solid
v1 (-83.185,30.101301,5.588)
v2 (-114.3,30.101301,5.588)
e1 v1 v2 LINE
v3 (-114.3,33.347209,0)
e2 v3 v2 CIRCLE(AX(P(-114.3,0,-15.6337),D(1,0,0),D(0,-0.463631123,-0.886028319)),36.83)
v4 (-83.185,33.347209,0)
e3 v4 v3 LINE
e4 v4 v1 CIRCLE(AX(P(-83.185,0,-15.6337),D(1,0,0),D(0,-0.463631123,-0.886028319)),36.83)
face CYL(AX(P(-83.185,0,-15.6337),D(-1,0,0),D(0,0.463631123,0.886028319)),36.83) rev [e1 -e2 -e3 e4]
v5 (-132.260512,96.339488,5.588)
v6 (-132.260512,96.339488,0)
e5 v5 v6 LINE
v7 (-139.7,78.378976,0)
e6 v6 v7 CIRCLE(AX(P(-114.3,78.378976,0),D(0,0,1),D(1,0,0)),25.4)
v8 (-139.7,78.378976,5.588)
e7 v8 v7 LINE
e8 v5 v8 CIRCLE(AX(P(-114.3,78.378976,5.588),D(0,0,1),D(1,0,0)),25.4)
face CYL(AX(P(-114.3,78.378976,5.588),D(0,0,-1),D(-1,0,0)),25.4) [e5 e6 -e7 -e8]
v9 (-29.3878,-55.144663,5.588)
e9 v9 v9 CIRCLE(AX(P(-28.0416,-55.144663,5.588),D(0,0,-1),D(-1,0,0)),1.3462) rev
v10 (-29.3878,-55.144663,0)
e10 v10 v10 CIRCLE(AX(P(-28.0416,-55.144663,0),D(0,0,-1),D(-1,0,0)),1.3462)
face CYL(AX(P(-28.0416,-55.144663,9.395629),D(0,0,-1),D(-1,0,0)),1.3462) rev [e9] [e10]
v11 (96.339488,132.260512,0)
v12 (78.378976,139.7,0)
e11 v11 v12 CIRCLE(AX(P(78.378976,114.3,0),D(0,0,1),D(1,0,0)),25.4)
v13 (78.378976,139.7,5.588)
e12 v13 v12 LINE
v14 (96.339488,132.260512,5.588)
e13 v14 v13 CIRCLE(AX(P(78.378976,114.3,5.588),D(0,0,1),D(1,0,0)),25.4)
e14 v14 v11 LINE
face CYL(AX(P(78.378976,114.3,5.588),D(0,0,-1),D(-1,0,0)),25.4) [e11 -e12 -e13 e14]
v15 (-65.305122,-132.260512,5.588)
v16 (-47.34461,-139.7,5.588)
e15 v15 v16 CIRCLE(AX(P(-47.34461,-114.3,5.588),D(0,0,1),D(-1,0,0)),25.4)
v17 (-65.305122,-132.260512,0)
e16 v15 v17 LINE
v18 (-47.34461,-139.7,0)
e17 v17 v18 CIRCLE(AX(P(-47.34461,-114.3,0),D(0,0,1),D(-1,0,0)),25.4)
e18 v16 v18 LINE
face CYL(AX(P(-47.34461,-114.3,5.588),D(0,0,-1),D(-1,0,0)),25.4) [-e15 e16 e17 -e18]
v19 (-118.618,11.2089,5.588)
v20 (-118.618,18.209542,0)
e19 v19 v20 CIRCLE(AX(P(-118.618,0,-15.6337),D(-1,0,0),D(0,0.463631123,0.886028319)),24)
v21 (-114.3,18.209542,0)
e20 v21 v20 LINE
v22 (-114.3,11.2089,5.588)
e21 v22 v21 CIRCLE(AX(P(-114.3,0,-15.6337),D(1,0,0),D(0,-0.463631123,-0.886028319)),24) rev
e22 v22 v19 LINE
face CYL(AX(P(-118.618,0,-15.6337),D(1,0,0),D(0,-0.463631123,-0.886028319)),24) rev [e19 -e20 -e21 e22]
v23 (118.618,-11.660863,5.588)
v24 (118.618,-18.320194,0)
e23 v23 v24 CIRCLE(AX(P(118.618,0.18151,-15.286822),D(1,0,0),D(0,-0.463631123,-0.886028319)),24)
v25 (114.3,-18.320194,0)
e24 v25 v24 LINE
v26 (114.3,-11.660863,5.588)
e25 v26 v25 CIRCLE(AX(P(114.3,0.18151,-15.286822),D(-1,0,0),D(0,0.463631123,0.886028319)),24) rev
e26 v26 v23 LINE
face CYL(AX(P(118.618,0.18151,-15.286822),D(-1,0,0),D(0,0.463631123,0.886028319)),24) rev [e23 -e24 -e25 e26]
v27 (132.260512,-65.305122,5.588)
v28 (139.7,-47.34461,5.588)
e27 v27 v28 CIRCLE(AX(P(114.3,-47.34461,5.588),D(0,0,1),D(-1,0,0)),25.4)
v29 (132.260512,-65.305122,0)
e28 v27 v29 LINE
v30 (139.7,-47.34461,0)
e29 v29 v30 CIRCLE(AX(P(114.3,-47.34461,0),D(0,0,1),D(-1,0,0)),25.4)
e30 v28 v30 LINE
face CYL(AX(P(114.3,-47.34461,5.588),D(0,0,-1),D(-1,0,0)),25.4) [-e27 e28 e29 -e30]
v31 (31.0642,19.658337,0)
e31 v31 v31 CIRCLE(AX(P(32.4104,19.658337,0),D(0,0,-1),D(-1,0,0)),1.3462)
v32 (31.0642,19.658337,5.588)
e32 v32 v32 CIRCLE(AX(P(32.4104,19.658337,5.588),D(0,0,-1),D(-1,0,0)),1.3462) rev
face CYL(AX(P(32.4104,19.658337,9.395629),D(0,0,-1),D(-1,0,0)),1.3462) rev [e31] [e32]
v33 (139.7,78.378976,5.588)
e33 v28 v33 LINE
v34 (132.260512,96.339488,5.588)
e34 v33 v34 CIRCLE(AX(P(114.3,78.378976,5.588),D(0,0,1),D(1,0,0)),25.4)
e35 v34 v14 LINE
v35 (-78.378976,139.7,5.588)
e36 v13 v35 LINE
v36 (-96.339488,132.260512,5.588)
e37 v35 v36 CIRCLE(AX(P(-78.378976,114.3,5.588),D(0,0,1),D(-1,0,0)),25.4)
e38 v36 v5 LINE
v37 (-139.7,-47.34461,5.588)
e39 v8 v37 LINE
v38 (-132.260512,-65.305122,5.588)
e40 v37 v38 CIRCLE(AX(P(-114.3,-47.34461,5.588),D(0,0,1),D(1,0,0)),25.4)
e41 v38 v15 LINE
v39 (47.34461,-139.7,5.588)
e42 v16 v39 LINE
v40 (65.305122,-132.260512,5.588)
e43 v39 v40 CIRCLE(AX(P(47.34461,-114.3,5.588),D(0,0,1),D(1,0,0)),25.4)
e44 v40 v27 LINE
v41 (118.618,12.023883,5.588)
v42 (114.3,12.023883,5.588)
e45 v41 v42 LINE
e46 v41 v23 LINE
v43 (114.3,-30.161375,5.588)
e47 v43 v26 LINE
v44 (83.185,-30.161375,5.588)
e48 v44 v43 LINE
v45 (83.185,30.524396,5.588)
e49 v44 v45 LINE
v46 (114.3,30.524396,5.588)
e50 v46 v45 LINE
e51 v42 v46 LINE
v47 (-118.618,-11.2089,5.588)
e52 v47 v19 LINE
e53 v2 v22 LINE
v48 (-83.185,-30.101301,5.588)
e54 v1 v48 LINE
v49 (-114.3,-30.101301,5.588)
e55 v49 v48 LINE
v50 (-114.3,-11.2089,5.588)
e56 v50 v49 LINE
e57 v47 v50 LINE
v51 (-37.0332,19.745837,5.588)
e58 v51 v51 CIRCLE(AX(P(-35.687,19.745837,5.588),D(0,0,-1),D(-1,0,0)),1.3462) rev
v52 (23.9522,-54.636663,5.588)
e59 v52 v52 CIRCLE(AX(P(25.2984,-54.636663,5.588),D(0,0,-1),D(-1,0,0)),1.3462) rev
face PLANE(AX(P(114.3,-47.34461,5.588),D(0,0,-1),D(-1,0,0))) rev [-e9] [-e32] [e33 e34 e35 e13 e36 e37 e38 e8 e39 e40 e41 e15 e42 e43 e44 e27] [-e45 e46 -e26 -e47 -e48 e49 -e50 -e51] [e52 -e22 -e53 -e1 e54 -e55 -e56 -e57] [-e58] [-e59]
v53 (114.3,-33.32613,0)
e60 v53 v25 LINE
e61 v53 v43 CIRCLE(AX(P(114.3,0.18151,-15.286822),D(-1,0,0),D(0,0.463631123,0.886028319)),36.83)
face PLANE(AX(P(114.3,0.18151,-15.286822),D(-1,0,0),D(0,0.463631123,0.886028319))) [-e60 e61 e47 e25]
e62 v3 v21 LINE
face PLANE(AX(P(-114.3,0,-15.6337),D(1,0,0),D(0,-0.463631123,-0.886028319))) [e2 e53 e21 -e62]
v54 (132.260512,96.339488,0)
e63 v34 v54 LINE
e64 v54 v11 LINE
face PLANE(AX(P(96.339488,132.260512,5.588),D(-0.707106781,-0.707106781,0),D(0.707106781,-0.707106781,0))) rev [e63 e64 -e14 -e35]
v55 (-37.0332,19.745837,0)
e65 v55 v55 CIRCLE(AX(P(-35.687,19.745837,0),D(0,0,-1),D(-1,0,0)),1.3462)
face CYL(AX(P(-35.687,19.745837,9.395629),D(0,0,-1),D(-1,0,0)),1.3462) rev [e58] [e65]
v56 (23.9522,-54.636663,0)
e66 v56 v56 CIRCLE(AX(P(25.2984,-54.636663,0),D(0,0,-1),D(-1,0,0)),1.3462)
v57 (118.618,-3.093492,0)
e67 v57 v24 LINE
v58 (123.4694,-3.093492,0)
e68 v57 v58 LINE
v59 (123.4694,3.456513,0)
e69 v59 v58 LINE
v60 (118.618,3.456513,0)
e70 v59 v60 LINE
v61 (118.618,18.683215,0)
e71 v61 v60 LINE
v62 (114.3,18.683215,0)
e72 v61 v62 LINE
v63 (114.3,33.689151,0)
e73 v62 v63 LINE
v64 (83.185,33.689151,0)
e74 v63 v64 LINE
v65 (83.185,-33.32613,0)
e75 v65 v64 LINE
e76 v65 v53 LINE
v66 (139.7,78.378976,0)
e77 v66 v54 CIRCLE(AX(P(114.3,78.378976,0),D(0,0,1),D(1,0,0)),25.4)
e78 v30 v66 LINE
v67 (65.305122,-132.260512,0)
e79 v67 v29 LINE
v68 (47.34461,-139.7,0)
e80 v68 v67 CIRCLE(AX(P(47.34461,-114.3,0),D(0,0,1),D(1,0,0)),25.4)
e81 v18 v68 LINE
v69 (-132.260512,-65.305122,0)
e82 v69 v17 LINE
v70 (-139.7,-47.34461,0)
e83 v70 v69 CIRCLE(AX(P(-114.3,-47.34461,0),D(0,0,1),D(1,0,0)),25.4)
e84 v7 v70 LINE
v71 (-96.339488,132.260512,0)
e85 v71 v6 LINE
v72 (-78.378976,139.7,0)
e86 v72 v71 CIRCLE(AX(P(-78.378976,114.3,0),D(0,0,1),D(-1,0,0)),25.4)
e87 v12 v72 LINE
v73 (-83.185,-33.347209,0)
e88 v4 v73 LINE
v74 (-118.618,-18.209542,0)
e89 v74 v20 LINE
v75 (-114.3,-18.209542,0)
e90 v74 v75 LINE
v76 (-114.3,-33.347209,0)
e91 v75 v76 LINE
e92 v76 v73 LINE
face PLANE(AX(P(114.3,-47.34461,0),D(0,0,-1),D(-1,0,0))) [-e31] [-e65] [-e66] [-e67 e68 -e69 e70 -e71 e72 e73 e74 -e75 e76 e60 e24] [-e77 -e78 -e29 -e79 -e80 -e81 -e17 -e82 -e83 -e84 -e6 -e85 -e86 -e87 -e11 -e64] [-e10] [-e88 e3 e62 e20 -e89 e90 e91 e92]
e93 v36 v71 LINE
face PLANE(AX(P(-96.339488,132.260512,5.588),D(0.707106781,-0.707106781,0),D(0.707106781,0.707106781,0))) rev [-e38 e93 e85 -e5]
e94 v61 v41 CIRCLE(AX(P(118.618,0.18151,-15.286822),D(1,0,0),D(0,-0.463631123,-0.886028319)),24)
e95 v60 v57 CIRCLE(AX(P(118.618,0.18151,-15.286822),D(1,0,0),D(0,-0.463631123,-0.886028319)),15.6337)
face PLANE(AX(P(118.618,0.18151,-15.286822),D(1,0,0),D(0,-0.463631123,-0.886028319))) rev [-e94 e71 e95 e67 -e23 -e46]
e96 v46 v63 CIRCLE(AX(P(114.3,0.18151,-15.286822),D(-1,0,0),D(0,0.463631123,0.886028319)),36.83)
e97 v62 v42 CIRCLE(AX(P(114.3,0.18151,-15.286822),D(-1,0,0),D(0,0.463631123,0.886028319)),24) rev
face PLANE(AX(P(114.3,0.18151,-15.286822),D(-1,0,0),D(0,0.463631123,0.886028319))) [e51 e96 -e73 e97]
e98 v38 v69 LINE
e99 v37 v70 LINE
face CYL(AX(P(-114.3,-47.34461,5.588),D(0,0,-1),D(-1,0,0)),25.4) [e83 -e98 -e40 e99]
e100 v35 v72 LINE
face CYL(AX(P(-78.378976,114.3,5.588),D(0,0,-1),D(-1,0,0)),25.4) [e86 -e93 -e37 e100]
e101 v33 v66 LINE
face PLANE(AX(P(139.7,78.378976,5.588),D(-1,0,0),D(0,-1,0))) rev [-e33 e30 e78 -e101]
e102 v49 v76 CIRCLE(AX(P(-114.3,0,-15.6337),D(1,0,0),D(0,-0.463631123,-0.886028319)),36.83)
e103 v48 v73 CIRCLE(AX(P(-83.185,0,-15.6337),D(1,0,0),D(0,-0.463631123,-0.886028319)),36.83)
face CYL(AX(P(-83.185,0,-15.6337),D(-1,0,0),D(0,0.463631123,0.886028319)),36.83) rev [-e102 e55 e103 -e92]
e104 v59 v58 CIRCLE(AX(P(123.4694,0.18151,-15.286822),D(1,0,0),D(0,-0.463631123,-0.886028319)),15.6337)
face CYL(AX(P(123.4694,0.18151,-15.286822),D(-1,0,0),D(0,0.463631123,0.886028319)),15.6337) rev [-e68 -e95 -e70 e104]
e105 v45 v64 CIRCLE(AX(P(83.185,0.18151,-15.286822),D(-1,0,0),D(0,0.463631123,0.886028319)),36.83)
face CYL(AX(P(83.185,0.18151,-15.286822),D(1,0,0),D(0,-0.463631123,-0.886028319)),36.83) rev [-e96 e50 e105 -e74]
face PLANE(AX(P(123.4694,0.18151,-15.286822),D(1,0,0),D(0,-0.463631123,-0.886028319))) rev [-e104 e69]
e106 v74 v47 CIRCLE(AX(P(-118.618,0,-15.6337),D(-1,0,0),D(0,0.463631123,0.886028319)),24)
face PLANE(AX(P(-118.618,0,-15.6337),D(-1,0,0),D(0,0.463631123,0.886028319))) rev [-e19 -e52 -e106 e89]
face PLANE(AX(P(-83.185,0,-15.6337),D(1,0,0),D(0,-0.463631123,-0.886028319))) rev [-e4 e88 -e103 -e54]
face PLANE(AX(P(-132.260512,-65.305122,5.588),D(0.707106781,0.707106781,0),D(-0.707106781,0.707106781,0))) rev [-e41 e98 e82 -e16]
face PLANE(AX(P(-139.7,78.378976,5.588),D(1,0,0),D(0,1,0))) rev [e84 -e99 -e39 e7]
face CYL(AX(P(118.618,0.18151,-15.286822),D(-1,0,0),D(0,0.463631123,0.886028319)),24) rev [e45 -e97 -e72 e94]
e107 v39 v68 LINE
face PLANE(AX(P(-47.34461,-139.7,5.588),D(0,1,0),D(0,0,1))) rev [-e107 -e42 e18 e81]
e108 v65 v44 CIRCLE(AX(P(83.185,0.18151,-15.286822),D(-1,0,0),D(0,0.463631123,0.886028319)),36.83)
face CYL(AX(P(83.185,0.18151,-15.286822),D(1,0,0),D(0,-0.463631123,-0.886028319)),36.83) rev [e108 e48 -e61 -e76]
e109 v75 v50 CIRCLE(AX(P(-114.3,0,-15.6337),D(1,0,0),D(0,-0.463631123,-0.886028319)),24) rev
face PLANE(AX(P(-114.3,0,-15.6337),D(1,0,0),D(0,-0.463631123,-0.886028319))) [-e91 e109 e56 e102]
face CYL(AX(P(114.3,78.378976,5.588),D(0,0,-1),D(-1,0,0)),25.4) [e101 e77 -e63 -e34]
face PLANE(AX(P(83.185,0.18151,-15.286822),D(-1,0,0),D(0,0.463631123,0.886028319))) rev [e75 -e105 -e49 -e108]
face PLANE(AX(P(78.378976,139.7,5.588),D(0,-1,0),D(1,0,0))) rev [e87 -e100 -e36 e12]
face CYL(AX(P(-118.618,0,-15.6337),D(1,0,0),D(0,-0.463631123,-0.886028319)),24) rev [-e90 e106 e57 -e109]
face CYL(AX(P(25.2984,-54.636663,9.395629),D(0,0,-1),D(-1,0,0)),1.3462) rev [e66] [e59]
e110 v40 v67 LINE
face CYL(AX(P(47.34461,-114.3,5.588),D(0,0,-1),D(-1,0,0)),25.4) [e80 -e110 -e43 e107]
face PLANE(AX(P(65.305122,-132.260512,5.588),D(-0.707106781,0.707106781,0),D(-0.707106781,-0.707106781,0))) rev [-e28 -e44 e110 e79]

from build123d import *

# Parameters (mm, degrees)
BOSS_EXTRUDE1_DEPTH = 5.588
SKETCH3_R           = 1.3462
CUT_EXTRUDE2_DEPTH  = 5.588
CAVITY1_START       = 83.185
CAVITY1_DEPTH       = 31.115
CAVITY1_START_2     = -114.3
CAVITY1_2_DEPTH     = 31.115
CAVITY1_START_3     = 114.3
CAVITY1_3_DEPTH     = 4.318
CAVITY1_START_4     = -118.618
CAVITY1_4_DEPTH     = 4.318
CAVITY1_START_5     = 118.618
CAVITY1_5_DEPTH     = 4.8514


# Read off the part's stored shape, not the designer's step: Cavity1
with BuildPart() as part:
    # Sketch1 → Boss-Extrude1 (new body)
    with BuildSketch(Plane.XY):
        with BuildLine():
            Line((65.305122421, -132.260512242), (132.260512242, -65.305122421))
            ThreePointArc((132.260512242, -65.305122421), (137.766540126, -57.064769361), (139.7, -47.344610179))
            Line((139.7, -47.344610179), (139.7, 78.378975516))
            ThreePointArc((139.7, 78.378975516), (137.766540126, 88.099134698), (132.260512242, 96.339487758))
            Line((132.260512242, 96.339487758), (96.339487758, 132.260512242))
            ThreePointArc((96.339487758, 132.260512242), (88.099134698, 137.766540126), (78.378975516, 139.7))
            Line((78.378975516, 139.7), (-78.378975516, 139.7))
            ThreePointArc((-78.378975516, 139.7), (-88.099134698, 137.766540126), (-96.339487758, 132.260512242))
            Line((-96.339487758, 132.260512242), (-132.260512242, 96.339487758))
            ThreePointArc((-132.260512242, 96.339487758), (-137.766540126, 88.099134698), (-139.7, 78.378975516))
            Line((-139.7, 78.378975516), (-139.7, -47.344610179))
            ThreePointArc((-139.7, -47.344610179), (-137.766540126, -57.064769361), (-132.260512242, -65.305122421))
            Line((-132.260512242, -65.305122421), (-65.305122421, -132.260512242))
            ThreePointArc((-65.305122421, -132.260512242), (-57.064769361, -137.766540126), (-47.344610179, -139.7))
            Line((-47.344610179, -139.7), (47.344610179, -139.7))
            ThreePointArc((47.344610179, -139.7), (57.064769361, -137.766540126), (65.305122421, -132.260512242))
        make_face()
    extrude(amount=BOSS_EXTRUDE1_DEPTH)

    # Sketch3 → Cut-Extrude2 (cut)
    with BuildSketch(Plane(origin=(0, 0, 0), x_dir=(-1, 0, 0), z_dir=(0, 0, -1))):
        with Locations((-32.4104, 19.658336728)):
            Circle(SKETCH3_R)
        with Locations((35.687, 19.745836517)):
            Circle(SKETCH3_R)
        with Locations((28.0416, -55.144663272)):
            Circle(SKETCH3_R)
        with Locations((-25.2984, -54.636663272)):
            Circle(SKETCH3_R)
    extrude(amount=-CUT_EXTRUDE2_DEPTH, mode=Mode.SUBTRACT)

    # Cavity1 outline → Cavity1 (cut)
    with BuildSketch(Plane.YZ.offset(CAVITY1_START)):
        with BuildLine():
            ThreePointArc((-30.161375078, 5.588), (-31.865780452, 2.863110305), (-33.326130038, 0))
            Line((-33.326130038, 0), (33.689150844, 0))
            ThreePointArc((33.689150844, 0), (32.228801258, 2.863110305), (30.524395884, 5.588))
            Line((30.524395884, 5.588), (-30.161375078, 5.588))
        make_face()
    extrude(amount=CAVITY1_DEPTH, mode=Mode.SUBTRACT)

    # Cavity1 2 outline → Cavity1 2 (cut)
    with BuildSketch(Plane.YZ.offset(CAVITY1_START_2)):
        with BuildLine():
            Line((-33.347208643, 0), (33.347208643, 0))
            ThreePointArc((33.347208643, 0), (31.84705315, 2.865329857), (30.101301452, 5.588))
            Line((30.101301452, 5.588), (-30.101301452, 5.588))
            ThreePointArc((-30.101301452, 5.588), (-31.84705315, 2.865329857), (-33.347208643, 0))
        make_face()
    extrude(amount=CAVITY1_2_DEPTH, mode=Mode.SUBTRACT)

    # Cavity1 3 outline → Cavity1 3 (cut)
    with BuildSketch(Plane.YZ.offset(CAVITY1_START_3)):
        with BuildLine():
            ThreePointArc((-11.660862641, 5.588), (-15.245647335, 3.098030401), (-18.320194056, 0))
            Line((-18.320194056, 0), (18.683214863, 0))
            ThreePointArc((18.683214863, 0), (15.608668142, 3.098030401), (12.023883447, 5.588))
            Line((12.023883447, 5.588), (-11.660862641, 5.588))
        make_face()
    extrude(amount=CAVITY1_3_DEPTH, mode=Mode.SUBTRACT)

    # Cavity1 4 outline → Cavity1 4 (cut)
    with BuildSketch(Plane.YZ.offset(CAVITY1_START_4)):
        with BuildLine():
            ThreePointArc((-11.208900442, 5.588), (-14.972228516, 3.12349524), (-18.209542122, 0))
            Line((-18.209542122, 0), (18.209542122, 0))
            ThreePointArc((18.209542122, 0), (14.972228516, 3.12349524), (11.208900442, 5.588))
            Line((11.208900442, 5.588), (-11.208900442, 5.588))
        make_face()
    extrude(amount=CAVITY1_4_DEPTH, mode=Mode.SUBTRACT)

    # Cavity1 5 outline → Cavity1 5 (cut)
    with BuildSketch(Plane.YZ.offset(CAVITY1_START_5)):
        with BuildLine():
            ThreePointArc((3.456513242, 0), (0.181510403, 0.346877829), (-3.093492436, 0))
            Line((-3.093492436, 0), (3.456513242, 0))
        make_face()
    extrude(amount=CAVITY1_5_DEPTH, mode=Mode.SUBTRACT)


solid = part.part
